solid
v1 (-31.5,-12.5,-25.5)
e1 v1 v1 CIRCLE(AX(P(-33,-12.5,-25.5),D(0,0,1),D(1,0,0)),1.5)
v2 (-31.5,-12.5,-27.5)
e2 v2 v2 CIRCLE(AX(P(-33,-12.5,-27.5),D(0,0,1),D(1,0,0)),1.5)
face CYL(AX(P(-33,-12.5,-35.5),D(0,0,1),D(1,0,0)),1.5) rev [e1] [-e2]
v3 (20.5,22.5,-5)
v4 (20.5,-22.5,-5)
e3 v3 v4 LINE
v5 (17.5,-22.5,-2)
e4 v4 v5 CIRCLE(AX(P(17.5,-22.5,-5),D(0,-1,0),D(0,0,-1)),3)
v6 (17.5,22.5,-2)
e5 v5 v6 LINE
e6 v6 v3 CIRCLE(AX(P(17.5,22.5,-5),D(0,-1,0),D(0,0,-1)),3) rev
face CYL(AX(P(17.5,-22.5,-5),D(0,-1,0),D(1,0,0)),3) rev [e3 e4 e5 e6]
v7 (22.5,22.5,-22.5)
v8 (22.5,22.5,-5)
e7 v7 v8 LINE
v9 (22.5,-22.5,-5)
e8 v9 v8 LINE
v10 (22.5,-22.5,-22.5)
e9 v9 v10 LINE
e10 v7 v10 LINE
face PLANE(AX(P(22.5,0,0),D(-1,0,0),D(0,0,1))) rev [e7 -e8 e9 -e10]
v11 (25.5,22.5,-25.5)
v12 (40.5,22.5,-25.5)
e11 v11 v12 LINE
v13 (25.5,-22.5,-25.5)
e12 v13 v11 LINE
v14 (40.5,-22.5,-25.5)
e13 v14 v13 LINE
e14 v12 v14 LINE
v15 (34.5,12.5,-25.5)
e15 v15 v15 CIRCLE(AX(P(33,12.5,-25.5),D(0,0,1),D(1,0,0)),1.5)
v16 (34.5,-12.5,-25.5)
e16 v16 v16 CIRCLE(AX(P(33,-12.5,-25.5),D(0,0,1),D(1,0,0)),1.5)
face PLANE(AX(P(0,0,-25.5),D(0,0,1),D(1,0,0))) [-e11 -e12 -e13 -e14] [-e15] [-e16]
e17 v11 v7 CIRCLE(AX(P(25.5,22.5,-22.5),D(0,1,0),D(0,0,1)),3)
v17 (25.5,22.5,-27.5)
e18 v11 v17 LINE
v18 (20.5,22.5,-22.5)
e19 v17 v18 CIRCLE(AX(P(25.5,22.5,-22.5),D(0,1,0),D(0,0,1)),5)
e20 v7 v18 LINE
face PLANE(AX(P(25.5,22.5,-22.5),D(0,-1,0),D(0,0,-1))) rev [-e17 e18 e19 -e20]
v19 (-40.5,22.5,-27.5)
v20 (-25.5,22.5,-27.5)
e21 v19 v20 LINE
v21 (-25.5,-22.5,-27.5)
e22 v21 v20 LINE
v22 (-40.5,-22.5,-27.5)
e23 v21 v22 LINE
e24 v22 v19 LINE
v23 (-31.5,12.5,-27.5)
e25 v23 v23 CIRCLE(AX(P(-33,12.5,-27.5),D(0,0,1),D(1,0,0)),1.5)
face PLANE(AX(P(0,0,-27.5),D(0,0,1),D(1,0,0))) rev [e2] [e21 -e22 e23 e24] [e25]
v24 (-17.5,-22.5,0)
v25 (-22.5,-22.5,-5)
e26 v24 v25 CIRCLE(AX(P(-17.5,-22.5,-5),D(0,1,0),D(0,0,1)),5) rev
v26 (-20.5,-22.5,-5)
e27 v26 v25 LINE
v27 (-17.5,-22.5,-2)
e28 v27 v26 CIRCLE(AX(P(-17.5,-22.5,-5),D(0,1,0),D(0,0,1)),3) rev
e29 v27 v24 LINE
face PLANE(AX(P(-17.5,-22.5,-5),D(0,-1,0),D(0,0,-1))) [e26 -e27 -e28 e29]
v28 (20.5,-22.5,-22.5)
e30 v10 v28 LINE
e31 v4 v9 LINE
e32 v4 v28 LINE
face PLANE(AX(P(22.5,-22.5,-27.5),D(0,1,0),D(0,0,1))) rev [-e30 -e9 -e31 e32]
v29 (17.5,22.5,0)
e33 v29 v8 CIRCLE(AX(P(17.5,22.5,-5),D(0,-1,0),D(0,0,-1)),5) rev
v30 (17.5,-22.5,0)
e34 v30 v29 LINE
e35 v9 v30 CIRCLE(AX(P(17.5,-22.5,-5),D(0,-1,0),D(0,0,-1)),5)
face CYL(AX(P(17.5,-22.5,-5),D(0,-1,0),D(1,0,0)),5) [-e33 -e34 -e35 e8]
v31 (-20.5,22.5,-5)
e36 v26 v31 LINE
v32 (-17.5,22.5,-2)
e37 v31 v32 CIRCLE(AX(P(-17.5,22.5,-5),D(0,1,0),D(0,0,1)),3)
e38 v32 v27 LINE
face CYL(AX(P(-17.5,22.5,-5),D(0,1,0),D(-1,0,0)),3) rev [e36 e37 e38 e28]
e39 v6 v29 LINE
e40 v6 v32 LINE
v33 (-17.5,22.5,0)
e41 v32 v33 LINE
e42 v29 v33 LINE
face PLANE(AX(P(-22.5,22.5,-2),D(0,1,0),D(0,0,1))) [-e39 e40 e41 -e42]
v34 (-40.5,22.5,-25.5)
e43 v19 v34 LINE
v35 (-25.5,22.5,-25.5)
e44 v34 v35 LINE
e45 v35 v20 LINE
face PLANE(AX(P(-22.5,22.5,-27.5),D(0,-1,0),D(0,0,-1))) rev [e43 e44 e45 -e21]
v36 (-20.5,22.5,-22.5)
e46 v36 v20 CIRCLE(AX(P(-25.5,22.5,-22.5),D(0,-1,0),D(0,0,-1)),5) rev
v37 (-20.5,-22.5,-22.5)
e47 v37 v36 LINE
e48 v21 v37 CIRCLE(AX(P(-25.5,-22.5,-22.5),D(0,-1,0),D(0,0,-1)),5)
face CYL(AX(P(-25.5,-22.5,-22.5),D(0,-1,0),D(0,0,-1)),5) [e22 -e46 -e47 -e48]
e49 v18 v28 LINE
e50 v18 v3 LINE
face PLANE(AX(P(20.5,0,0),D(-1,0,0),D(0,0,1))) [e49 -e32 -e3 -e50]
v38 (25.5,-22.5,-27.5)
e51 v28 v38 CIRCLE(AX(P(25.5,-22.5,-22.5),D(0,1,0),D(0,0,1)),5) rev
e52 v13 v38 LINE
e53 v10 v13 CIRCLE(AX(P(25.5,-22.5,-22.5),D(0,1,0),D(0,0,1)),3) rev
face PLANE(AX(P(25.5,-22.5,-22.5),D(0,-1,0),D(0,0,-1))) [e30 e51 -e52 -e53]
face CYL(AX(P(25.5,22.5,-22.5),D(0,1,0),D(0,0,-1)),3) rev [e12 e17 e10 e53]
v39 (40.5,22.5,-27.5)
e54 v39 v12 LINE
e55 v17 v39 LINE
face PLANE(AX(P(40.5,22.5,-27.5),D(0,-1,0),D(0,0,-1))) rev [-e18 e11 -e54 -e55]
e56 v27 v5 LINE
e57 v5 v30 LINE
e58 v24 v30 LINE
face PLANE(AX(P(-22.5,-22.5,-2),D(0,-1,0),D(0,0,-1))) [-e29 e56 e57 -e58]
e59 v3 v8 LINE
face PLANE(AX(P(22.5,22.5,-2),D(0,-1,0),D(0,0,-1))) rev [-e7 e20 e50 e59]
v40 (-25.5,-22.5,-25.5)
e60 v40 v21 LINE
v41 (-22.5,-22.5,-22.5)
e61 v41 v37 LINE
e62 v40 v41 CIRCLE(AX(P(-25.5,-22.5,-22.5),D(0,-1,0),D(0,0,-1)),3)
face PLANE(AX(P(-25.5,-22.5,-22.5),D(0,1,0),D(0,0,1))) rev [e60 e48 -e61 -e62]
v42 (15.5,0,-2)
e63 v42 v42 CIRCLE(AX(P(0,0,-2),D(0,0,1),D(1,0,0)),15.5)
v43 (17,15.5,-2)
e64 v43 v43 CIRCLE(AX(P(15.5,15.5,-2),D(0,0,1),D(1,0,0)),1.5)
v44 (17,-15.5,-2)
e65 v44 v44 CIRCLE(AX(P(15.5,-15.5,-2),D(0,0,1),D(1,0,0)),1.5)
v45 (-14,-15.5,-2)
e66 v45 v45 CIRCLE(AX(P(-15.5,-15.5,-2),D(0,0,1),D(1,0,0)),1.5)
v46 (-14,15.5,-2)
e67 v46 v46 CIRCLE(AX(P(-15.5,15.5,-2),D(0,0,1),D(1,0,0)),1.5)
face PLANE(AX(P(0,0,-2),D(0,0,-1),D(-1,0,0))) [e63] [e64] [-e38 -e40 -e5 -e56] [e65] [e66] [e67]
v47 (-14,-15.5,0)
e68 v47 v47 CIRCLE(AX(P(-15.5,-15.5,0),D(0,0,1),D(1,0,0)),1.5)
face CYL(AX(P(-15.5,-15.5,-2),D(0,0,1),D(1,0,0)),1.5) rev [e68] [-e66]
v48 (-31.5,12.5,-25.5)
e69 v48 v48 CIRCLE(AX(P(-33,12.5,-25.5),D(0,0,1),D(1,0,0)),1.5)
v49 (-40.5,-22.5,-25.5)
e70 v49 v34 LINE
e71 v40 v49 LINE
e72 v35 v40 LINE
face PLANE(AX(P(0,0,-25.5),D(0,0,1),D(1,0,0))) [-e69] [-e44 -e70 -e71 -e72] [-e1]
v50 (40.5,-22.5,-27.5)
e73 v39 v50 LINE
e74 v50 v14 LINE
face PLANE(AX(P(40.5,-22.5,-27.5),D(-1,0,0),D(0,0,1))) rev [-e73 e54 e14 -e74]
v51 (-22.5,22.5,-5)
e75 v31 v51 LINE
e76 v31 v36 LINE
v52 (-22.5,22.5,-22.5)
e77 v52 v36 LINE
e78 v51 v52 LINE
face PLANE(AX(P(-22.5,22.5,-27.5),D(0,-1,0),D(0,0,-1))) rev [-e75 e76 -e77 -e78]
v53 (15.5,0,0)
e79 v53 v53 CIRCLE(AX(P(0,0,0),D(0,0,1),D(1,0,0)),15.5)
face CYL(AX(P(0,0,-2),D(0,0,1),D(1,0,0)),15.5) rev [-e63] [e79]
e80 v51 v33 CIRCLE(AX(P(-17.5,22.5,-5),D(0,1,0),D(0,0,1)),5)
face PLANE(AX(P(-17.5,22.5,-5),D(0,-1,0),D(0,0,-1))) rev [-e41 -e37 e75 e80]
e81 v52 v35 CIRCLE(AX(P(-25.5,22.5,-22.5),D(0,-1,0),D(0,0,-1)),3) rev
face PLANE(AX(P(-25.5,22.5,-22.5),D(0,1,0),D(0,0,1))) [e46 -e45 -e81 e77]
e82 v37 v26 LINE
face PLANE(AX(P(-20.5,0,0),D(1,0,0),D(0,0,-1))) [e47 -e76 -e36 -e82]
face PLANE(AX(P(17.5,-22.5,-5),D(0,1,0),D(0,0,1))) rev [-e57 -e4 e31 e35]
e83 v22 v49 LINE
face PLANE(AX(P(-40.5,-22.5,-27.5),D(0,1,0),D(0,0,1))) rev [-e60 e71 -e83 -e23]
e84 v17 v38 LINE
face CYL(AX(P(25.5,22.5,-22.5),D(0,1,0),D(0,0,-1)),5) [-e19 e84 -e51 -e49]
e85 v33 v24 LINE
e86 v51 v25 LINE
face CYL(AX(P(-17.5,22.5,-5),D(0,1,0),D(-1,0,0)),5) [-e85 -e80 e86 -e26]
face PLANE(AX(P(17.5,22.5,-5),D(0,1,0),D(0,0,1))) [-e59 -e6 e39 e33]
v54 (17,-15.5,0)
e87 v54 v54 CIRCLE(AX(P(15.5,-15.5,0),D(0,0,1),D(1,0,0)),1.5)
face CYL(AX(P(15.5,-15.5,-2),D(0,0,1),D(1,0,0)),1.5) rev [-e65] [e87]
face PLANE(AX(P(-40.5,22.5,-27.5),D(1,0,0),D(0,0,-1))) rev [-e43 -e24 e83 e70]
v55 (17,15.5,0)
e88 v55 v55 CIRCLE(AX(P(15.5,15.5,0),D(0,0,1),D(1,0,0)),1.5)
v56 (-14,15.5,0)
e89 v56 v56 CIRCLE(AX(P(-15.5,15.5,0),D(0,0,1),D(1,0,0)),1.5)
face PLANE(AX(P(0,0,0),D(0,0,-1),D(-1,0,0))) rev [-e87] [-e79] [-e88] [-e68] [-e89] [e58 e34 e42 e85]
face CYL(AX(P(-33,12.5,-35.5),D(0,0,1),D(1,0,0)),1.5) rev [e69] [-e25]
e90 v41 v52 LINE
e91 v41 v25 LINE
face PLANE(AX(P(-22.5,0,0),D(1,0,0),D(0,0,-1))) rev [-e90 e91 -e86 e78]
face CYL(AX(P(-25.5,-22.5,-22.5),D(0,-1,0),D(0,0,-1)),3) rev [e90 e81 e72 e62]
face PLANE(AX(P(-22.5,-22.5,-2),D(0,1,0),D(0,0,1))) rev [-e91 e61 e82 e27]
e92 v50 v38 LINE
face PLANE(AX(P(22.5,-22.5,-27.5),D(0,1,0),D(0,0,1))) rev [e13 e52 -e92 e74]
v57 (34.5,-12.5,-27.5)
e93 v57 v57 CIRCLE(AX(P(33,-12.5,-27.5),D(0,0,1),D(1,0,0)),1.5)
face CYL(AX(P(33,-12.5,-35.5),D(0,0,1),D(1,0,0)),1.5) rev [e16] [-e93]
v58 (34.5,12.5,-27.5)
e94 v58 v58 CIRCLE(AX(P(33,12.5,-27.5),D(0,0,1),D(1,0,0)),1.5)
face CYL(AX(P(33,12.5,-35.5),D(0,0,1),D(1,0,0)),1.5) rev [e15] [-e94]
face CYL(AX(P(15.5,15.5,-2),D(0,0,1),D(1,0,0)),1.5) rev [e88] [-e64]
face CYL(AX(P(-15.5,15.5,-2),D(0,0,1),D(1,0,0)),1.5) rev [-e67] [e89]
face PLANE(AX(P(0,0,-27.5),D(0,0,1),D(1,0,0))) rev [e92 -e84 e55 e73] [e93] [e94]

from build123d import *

# Parameters (mm, degrees)
SKETCH1_W                    = 45
SKETCH1_H                    = 45
SKETCH1_R                    = 15.5
SKETCH1_R_2                  = 1.5
BASE_FLANGE1_DEPTH           = 2
EDGE_FLANGE1_STRIP_W         = 14
EDGE_FLANGE1_STRIP_H         = 2
EDGE_FLANGE1_STRIP_CUT_DEPTH = 45
EDGE_FLANGE1_DEPTH           = 45
EDGE_FLANGE2_STRIP_W         = 14
EDGE_FLANGE2_STRIP_H         = 2
EDGE_FLANGE2_STRIP_CUT_DEPTH = 45
EDGE_FLANGE2_DEPTH           = 45
EDGE_FLANGE3_STRIP_W         = 14
EDGE_FLANGE3_STRIP_H         = 2
EDGE_FLANGE3_STRIP_CUT_DEPTH = 45
EDGE_FLANGE3_DEPTH           = 45
EDGE_FLANGE4_STRIP_W         = 14
EDGE_FLANGE4_STRIP_H         = 2
EDGE_FLANGE4_STRIP_CUT_DEPTH = 45
EDGE_FLANGE4_DEPTH           = 45
SKETCH18_R                   = 1.5
CUT_EXTRUDE1_DEPTH           = 10
SKETCH19_R                   = 1.5
CUT_EXTRUDE2_DEPTH           = 10


# Sheet-metal steps are written as plain solids
with BuildPart() as part:
    # Sketch1 → Base-Flange1 (new body)
    with BuildSketch(Plane.XY):
        Rectangle(SKETCH1_W, SKETCH1_H)
        Circle(SKETCH1_R, mode=Mode.SUBTRACT)
        with Locations((-15.5, 15.5)):
            Circle(SKETCH1_R_2, mode=Mode.SUBTRACT)
        with Locations((15.5, 15.5)):
            Circle(SKETCH1_R_2, mode=Mode.SUBTRACT)
        with Locations((15.5, -15.5)):
            Circle(SKETCH1_R_2, mode=Mode.SUBTRACT)
        with Locations((-15.5, -15.5)):
            Circle(SKETCH1_R_2, mode=Mode.SUBTRACT)
    extrude(amount=-BASE_FLANGE1_DEPTH)

    # Edge-Flange1 strip (across the edge) → Edge-Flange1 strip cut (cut)
    with BuildSketch(Plane(origin=(22.5, 22.5, -2), x_dir=(-1, 0, 0), z_dir=(0, -1, 0))):
        with Locations((-2, -1)):
            Rectangle(EDGE_FLANGE1_STRIP_W, EDGE_FLANGE1_STRIP_H)
    extrude(amount=EDGE_FLANGE1_STRIP_CUT_DEPTH, mode=Mode.SUBTRACT)

    # Edge-Flange1 section (across the edge) → Edge-Flange1 (add)
    with BuildSketch(Plane(origin=(22.5, 22.5, -2), x_dir=(-1, 0, 0), z_dir=(0, -1, 0))):
        with BuildLine():
            Line((0, 3), (0, 25.5))
            Line((0, 25.5), (2, 25.5))
            Line((2, 25.5), (2, 3))
            ThreePointArc((2, 3), (2.878679656, 0.878679656), (5, 0))
            Line((5, 0), (5, -2))
            ThreePointArc((5, -2), (1.464466094, -0.535533906), (0, 3))
        make_face()
    extrude(amount=EDGE_FLANGE1_DEPTH)

    # Edge-Flange2 strip (across the edge) → Edge-Flange2 strip cut (cut)
    with BuildSketch(Plane(origin=(22.5, -22.5, -27.5), x_dir=(0, 0, 1), z_dir=(0, 1, 0))):
        with Locations((-2, -1)):
            Rectangle(EDGE_FLANGE2_STRIP_W, EDGE_FLANGE2_STRIP_H)
    extrude(amount=EDGE_FLANGE2_STRIP_CUT_DEPTH, mode=Mode.SUBTRACT)

    # Edge-Flange2 section (across the edge) → Edge-Flange2 (add)
    with BuildSketch(Plane(origin=(22.5, -22.5, -27.5), x_dir=(0, 0, 1), z_dir=(0, 1, 0))):
        with BuildLine():
            Line((0, 3), (0, 18))
            Line((0, 18), (2, 18))
            Line((2, 18), (2, 3))
            ThreePointArc((2, 3), (2.878679656, 0.878679656), (5, 0))
            Line((5, 0), (5, -2))
            ThreePointArc((5, -2), (1.464466094, -0.535533906), (0, 3))
        make_face()
    extrude(amount=EDGE_FLANGE2_DEPTH)

    # Edge-Flange3 strip (across the edge) → Edge-Flange3 strip cut (cut)
    with BuildSketch(Plane(origin=(-22.5, -22.5, -2), x_dir=(1, 0, 0), z_dir=(0, 1, 0))):
        with Locations((-2, -1)):
            Rectangle(EDGE_FLANGE3_STRIP_W, EDGE_FLANGE3_STRIP_H)
    extrude(amount=EDGE_FLANGE3_STRIP_CUT_DEPTH, mode=Mode.SUBTRACT)

    # Edge-Flange3 section (across the edge) → Edge-Flange3 (add)
    with BuildSketch(Plane(origin=(-22.5, -22.5, -2), x_dir=(1, 0, 0), z_dir=(0, 1, 0))):
        with BuildLine():
            Line((0, 3), (0, 25.5))
            Line((0, 25.5), (2, 25.5))
            Line((2, 25.5), (2, 3))
            ThreePointArc((2, 3), (2.878679656, 0.878679656), (5, 0))
            Line((5, 0), (5, -2))
            ThreePointArc((5, -2), (1.464466094, -0.535533906), (0, 3))
        make_face()
    extrude(amount=EDGE_FLANGE3_DEPTH)

    # Edge-Flange4 strip (across the edge) → Edge-Flange4 strip cut (cut)
    with BuildSketch(Plane(origin=(-22.5, 22.5, -27.5), x_dir=(0, 0, 1), z_dir=(0, -1, 0))):
        with Locations((-2, -1)):
            Rectangle(EDGE_FLANGE4_STRIP_W, EDGE_FLANGE4_STRIP_H)
    extrude(amount=EDGE_FLANGE4_STRIP_CUT_DEPTH, mode=Mode.SUBTRACT)

    # Edge-Flange4 section (across the edge) → Edge-Flange4 (add)
    with BuildSketch(Plane(origin=(-22.5, 22.5, -27.5), x_dir=(0, 0, 1), z_dir=(0, -1, 0))):
        with BuildLine():
            Line((0, 3), (0, 18))
            Line((0, 18), (2, 18))
            Line((2, 18), (2, 3))
            ThreePointArc((2, 3), (2.878679656, 0.878679656), (5, 0))
            Line((5, 0), (5, -2))
            ThreePointArc((5, -2), (1.464466094, -0.535533906), (0, 3))
        make_face()
    extrude(amount=EDGE_FLANGE4_DEPTH)

    # Sketch18 → Cut-Extrude1 (cut)
    with BuildSketch(Plane.XY.offset(-25.5)):
        with Locations((-33, 12.5)):
            Circle(SKETCH18_R)
        with Locations((-33, -12.5)):
            Circle(SKETCH18_R)
    extrude(amount=-CUT_EXTRUDE1_DEPTH, mode=Mode.SUBTRACT)

    # Sketch19 → Cut-Extrude2 (cut)
    with BuildSketch(Plane.XY.offset(-25.5)):
        with Locations((33, 12.5)):
            Circle(SKETCH19_R)
        with Locations((33, -12.5)):
            Circle(SKETCH19_R)
    extrude(amount=-CUT_EXTRUDE2_DEPTH, mode=Mode.SUBTRACT)


solid = part.part
